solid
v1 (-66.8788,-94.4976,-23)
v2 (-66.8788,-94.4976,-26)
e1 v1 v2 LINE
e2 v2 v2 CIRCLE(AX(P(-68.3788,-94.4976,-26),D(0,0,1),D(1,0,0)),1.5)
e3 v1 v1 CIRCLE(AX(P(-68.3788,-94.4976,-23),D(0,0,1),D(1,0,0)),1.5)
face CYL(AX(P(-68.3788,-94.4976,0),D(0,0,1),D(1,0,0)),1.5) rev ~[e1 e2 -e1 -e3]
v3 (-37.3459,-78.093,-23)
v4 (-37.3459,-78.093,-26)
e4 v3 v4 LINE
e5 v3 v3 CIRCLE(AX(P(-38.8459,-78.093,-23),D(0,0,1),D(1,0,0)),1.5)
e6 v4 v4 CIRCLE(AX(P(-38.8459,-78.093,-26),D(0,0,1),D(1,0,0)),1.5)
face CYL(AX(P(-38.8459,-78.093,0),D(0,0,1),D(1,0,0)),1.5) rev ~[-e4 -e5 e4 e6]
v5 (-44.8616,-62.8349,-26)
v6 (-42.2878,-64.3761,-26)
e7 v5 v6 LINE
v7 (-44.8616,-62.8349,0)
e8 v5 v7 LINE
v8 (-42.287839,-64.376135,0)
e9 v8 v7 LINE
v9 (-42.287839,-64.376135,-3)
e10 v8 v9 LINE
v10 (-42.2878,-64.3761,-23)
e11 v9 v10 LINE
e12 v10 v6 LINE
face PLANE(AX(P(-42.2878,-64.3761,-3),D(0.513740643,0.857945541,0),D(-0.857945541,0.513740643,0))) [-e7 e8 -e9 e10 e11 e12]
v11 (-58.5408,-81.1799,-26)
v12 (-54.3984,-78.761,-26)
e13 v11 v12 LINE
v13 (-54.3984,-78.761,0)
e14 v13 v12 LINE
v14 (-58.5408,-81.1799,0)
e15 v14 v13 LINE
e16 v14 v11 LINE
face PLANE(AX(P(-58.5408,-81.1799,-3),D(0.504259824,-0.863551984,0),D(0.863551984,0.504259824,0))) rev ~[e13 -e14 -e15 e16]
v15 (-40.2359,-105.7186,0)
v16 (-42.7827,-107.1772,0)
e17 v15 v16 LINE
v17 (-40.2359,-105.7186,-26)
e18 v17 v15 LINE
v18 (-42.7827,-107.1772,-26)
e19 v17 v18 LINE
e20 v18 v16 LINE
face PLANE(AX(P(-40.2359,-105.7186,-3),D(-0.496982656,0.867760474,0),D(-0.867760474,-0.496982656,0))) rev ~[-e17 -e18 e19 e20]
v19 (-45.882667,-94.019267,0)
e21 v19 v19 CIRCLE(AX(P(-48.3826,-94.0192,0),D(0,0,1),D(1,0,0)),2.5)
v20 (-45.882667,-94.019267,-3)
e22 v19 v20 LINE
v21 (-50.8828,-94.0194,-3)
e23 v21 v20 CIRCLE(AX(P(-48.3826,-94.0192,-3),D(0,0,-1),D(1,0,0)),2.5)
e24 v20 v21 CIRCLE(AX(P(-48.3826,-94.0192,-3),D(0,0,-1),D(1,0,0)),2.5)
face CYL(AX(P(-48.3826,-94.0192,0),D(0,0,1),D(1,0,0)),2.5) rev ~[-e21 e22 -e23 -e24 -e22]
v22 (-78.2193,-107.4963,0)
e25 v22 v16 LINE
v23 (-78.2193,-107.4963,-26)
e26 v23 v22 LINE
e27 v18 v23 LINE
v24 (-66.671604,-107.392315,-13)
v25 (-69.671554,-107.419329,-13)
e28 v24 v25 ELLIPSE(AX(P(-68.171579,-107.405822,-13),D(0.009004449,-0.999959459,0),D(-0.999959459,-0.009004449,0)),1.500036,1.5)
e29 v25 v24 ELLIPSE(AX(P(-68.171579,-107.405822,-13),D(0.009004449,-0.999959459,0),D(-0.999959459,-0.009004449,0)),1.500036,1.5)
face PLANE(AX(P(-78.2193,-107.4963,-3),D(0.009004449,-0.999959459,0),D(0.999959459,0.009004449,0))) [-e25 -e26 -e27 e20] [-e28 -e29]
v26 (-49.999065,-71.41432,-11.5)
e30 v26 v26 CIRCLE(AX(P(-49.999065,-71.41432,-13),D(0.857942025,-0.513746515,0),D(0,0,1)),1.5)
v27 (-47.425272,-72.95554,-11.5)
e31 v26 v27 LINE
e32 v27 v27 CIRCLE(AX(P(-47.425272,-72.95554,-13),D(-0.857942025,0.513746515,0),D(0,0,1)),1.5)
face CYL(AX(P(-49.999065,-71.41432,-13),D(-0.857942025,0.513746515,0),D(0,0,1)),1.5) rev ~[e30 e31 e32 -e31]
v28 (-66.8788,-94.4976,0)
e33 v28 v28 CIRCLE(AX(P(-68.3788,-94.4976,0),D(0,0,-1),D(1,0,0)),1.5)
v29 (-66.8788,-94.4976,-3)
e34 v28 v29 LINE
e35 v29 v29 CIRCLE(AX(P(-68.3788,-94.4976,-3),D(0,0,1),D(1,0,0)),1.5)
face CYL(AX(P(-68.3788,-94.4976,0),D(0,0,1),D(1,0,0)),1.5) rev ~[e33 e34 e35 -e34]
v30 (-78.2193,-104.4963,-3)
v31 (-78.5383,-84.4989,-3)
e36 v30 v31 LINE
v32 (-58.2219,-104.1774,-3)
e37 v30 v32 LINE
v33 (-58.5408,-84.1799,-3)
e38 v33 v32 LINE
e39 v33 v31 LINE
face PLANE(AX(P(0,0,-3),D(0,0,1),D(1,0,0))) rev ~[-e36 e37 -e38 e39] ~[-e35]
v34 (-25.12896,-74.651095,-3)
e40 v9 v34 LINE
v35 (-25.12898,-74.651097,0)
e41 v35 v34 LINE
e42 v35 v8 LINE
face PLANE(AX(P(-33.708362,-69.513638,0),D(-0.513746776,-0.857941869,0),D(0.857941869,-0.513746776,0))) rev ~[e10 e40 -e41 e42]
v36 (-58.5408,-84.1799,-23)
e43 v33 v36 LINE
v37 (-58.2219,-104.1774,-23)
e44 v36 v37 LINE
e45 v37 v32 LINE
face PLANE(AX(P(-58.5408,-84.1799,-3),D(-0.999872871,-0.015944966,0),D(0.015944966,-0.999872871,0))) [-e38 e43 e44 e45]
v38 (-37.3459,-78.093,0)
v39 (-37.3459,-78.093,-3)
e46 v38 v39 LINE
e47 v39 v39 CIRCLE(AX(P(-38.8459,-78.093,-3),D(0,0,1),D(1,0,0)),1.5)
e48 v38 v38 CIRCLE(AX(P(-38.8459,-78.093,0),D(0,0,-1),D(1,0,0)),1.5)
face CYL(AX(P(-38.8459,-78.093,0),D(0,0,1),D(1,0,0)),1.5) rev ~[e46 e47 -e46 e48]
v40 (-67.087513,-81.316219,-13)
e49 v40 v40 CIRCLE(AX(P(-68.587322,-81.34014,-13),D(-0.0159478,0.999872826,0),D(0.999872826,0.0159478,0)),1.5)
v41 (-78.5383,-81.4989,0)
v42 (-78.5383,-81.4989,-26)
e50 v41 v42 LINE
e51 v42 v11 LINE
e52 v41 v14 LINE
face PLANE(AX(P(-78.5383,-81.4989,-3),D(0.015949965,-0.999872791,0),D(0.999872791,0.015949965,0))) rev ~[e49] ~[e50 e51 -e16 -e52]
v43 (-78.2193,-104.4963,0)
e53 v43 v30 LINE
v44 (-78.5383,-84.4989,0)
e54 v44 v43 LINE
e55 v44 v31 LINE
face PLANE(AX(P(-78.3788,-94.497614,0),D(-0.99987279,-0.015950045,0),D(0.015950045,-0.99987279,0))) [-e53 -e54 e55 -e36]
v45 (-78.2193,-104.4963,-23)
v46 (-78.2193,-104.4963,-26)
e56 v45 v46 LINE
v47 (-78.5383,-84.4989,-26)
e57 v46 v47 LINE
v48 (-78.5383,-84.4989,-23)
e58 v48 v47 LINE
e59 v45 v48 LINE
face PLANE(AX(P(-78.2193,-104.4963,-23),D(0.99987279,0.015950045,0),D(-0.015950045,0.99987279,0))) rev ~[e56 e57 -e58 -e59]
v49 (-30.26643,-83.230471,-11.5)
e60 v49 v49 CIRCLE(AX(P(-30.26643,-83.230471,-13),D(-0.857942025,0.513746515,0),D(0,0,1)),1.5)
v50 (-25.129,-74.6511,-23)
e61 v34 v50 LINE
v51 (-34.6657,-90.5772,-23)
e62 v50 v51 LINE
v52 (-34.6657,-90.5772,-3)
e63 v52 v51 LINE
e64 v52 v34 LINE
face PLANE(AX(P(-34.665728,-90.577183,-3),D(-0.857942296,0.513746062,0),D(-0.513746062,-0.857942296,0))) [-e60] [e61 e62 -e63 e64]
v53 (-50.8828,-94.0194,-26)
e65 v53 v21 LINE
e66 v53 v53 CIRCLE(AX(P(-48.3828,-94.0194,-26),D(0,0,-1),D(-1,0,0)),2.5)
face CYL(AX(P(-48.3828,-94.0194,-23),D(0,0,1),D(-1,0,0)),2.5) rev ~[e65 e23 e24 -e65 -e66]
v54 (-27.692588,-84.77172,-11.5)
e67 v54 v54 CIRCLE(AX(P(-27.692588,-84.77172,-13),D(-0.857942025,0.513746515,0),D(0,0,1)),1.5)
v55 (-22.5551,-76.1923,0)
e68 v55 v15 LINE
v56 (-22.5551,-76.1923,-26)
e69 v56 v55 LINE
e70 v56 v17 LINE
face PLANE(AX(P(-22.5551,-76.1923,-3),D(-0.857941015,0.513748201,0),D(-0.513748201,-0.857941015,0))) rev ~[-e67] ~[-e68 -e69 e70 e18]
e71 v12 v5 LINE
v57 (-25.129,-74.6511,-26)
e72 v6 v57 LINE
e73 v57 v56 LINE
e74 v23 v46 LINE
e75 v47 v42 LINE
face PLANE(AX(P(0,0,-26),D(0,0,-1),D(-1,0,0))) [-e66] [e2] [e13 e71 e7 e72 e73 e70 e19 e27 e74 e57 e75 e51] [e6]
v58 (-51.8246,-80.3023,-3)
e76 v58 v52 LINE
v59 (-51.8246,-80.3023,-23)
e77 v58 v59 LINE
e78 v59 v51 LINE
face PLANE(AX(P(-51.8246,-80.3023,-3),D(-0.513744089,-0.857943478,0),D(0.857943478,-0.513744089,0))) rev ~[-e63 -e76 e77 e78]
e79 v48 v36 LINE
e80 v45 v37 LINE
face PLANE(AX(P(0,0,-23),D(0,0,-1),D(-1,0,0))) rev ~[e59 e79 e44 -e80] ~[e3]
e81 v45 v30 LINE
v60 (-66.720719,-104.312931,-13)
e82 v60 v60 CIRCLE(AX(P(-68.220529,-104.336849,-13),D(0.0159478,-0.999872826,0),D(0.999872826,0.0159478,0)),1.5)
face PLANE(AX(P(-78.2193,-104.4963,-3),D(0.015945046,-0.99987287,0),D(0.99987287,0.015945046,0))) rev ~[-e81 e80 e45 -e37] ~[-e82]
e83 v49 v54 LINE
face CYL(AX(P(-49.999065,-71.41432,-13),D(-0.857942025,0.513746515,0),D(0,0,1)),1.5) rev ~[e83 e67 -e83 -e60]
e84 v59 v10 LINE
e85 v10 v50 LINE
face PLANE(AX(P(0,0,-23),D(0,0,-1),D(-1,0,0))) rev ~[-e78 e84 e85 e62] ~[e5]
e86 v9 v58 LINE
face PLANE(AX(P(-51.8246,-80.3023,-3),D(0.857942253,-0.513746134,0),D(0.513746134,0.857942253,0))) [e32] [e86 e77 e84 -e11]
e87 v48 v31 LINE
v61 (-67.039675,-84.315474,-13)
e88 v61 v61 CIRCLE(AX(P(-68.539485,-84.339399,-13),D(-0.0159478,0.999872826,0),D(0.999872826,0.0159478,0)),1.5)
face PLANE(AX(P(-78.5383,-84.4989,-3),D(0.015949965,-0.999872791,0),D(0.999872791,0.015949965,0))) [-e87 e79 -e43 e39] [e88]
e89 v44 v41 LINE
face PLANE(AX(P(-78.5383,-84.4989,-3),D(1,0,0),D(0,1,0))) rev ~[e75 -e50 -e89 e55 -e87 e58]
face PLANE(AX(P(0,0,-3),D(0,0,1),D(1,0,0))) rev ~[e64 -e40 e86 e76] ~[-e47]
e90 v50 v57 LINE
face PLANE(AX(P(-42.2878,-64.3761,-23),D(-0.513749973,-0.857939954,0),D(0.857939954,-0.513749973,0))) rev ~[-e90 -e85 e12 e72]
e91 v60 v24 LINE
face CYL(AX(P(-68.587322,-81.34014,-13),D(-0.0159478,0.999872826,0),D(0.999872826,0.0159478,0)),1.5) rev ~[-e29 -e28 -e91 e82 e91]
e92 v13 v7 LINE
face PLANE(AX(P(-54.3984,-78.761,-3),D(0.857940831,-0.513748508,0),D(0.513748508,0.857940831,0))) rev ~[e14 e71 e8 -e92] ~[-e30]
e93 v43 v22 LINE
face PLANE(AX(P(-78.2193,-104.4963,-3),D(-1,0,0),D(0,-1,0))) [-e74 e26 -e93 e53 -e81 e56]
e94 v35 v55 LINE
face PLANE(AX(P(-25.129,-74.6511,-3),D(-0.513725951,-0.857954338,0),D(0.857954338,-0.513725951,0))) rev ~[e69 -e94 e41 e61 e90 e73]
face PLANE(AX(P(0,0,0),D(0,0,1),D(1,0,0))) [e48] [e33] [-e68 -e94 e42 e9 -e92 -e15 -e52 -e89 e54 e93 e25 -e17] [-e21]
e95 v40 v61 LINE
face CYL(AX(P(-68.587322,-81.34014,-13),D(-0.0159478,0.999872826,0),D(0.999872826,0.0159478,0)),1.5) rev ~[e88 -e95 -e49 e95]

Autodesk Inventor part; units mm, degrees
ref_plane "YZ Plane" through (0, 0, 0) normal (1, 0, 0) x (0, 1, 0)
ref_plane "XZ Plane" through (0, 0, 0) normal (0, 1, 0) x (-1, 0, 0)
ref_plane "XY Plane" through (0, 0, 0) normal (0, 0, 1) x (1, 0, 0)
sketch "Sketch1" plane through (0, 0, 0) normal (0, 0, 1) x (1, 0, 0)
  circle A0 centre (-48.3826, -94.0192) radius 2.5
  circle A1 centre (2.8152, 8.6005) radius 2.5
  line L0 (-48.3826, -94.0192) -> (40.5013, 54.4144)
  line L1 (2.8152, 8.6005) -> (32.8522, -42.034)
  line L2 (-2.0828, 38.9998) -> (-2.0828, -39)
  line L3 (-2.0828, -0.0001) -> (69.8745, -0.0001)
  line L4 (7.9172, -0.0001) -> (-0.6834, -5.1021)
  line L5 (2.8152, 8.6005) -> (7.9172, -0.0001)
  line L6 (7.9172, -0.0001) -> (16.5177, 5.1019)
  line L7 (7.9172, -0.0001) -> (-0.6834, -5.1021)
  line L8 (-0.6834, -5.1021) -> (-0.6834, -5.1021)
  line L9 (7.9172, -0.0001) -> (16.5177, 5.1019)
  line L10 (16.5177, 5.1019) -> (16.5177, 5.1019)
  line L11 (7.9172, -0.0001) -> (-0.6622, 5.1374)
  line L12 (7.9172, -0.0001) -> (16.4966, -5.1375)
  line L13 (-48.3826, -94.0192) -> (-43.2452, -85.4397)
  line L14 (-54.6233, -56.9895) -> (-9.7188, -83.8789)
  line L15 (-43.2452, -85.4397) -> (-34.6657, -90.5772)
  line L16 (-43.2452, -85.4397) -> (-51.8246, -80.3023)
  line L17 (-34.6657, -90.5772) -> (16.4966, -5.1375)
  line L18 (-0.6622, 5.1374) -> (-51.8246, -80.3023)
  line L19 (-3.7386, 0) -> (13.452, 10.2217)
  line L20 (-3.7386, 0) -> (13.4203, -10.2749)
  circle A2 centre (6.9172, -34) radius 2.5
  circle A3 centre (6.9172, -34) radius 5
  circle A4 centre (6.9172, 34) radius 2.5
  circle A5 centre (6.9172, 34) radius 4.9998
  line L21 (15.8878, 38.9998) -> (-2.0828, 38.9998)
  line L22 (-2.0828, -39) -> (15.933, -39)
  line L23 (-13.3434, -16.0398) -> (19.6624, -35.8041)
  line L24 (-13.3434, 16.0396) -> (19.6624, 35.8039)
  line L25 (-13.3434, -16.0398) -> (-15.9172, -14.4985)
  line L26 (-2.0828, -0.0001) -> (-26.2435, -0.0001)
  line L27 (-15.9172, -14.4985) -> (-7.2354, -0.0001)
  line L28 (-13.3434, 16.0396) -> (-15.9172, 14.4984)
  line L29 (-15.9172, 14.4984) -> (-7.2354, -0.0001)
  line L30 (13.4203, -10.2749) -> (15.9172, -11.7701)
  line L31 (15.933, -39) -> (15.8878, 38.9998)
  line L32 (13.452, 10.2217) -> (15.9037, 11.6795)
  line L33 (15.9037, 11.6795) -> (6.3124, 27.8097)
  line L34 (15.9172, -11.7701) -> (6.3124, -27.8099)
  line L35 (15.9037, 11.6795) -> (15.9172, -11.7701)
  line L36 (-15.9172, -14.4985) -> (-15.9172, 14.4984)
  line L37 (6.3124, 27.8097) -> (-15.9172, 14.4984) projected
  circle A6 centre (-48.3826, -94.0192) radius 2.5
  line L38 (-311.4249, 0) -> (127.5863, 0)
  line L39 (-170.3704, -117.2696) -> (-13.4682, 154.4931)
  line L40 (-102.6648, 0) -> (-157.9558, -95.7668)
  line L41 (-157.9558, -95.7668) -> (-48.3826, -94.0192)
  line L42 (-48.3826, -94.0192) -> (-58.3814, -94.1786)
  line L43 (-58.3814, -94.1786) -> (-58.5408, -84.1799)
  line L44 (-58.5408, -84.1799) -> (-58.2219, -104.1774)
  line L45 (-51.8246, -80.3023) -> (-41.5497, -63.1434)
  line L46 (-41.5497, -63.1434) -> (-24.3908, -73.4184)
  line L47 (-58.5408, -84.1799) -> (-78.5383, -84.4989)
  line L48 (-78.5383, -84.4989) -> (-78.2193, -104.4963)
  line L49 (-78.2193, -104.4963) -> (-58.2219, -104.1774)
  line L50 (-58.5408, -84.1799) -> (-51.8246, -80.3023)
  line L51 (-58.2219, -104.1774) -> (-26.2433, -104.1774)
  line L52 (-34.6657, -90.5772) -> (-48.6317, -113.8999)
  circle A7 centre (-48.3828, -94.0194) radius 2.5 projected
  point P0 (0, 0)
  point P1 (6.9172, -21)
  point P2 (-3.7386, 0)
  point P3 (-42.2878, -64.3761)
  point P4 (-42.8097, -104.1774)
  point P5 (-25.129, -74.6511)
  dimension "d0" = 10
  dimension "d1" = 10
  dimension "d2" = 10
  dimension "d3" = 10
  dimension "d4" = 10
  dimension "d5" = 10
  dimension "d6" = 10
  dimension "d7" = 10
  dimension "d8" = 10
  dimension "d9" = 10
  dimension "d10" = 10
  dimension "d11" = 20
  dimension "d12" = 20
  dimension "d13" = 3
  dimension "d14" = 3
  dimension "d20" = 110.582
  dimension "d21" = 10
  dimension "d22" = 10
  dimension "d23" = 20
  dimension "d24" = 20
  dimension "d25" = 20
  dimension "d26" = 121.827
  dimension "d27" = 146.9972
extrude "Extrusion1" add sketch "Sketch1" against normal blind 3 contours A0 L0 L15 L52 L51 L44 L41 | A0 L41 L43 L50 L16 L0 | L16 L18 L14 L0 | L0 L14 L17 L15 | L44 L49 L48 L41 | L41 L48 L47 L43
sketch "Sketch2" plane through (0, 0, -3) normal (0, 0, -1) x (-1, 0, 0)
  line L0 (51.8246, -80.3023) -> (42.2878, -64.3761) projected
  line L1 (25.129, -74.6511) -> (42.8097, -104.1774) projected
  line L2 (78.5383, -84.4989) -> (58.5408, -84.1799)
  line L3 (58.5408, -84.1799) -> (51.8246, -80.3023)
  line L4 (42.2878, -64.3761) -> (25.129, -74.6511)
  line L5 (78.5383, -84.4989) -> (78.2193, -104.4963)
  line L6 (58.5408, -84.1799) -> (58.5408, -81.1799)
  line L7 (51.8246, -80.3023) -> (54.3984, -78.761)
  line L8 (42.8097, -104.1774) -> (40.2359, -105.7186)
  line L9 (42.8097, -104.1774) -> (42.7827, -107.1772)
  line L10 (78.5383, -84.4989) -> (78.5383, -81.4989)
  line L11 (78.2193, -104.4963) -> (78.2193, -107.4963)
  line L12 (42.2878, -64.3761) -> (44.8616, -62.8349)
  line L13 (42.2878, -64.3761) -> (25.129, -74.6511) projected
  line L14 (25.129, -74.6511) -> (22.5551, -76.1923)
  line L15 (78.5383, -81.4989) -> (58.5408, -81.1799)
  line L16 (58.5408, -81.1799) -> (54.3984, -78.761)
  line L17 (54.3984, -78.761) -> (44.8616, -62.8349)
  line L18 (22.5551, -76.1923) -> (40.2359, -105.7186)
  line L19 (40.2359, -105.7186) -> (42.7827, -107.1772)
  line L20 (78.2193, -107.4963) -> (42.7827, -107.1772)
  line L21 (58.5408, -84.1799) -> (58.2219, -104.1774)
  line L22 (51.8246, -80.3023) -> (34.6657, -90.5772)
  circle A0 centre (48.3826, -94.0192) radius 2.5 projected
  circle A1 centre (48.3826, -94.0192) radius 2.5
  line L23 (78.2193, -104.4963) -> (42.8097, -104.1774)
  line L24 (58.2219, -104.1774) -> (42.8097, -104.1774) projected
  line L25 (78.2193, -104.4963) -> (58.2219, -104.1774) projected
  point P0 (0, 0)
  dimension "d30" = 3
  dimension "d31" = 3
  dimension "d32" = 3
  dimension "d33" = 3
  dimension "d34" = 3
  dimension "d35" = 3
  dimension "d36" = 3
  dimension "d37" = 3
extrude "Extrusion2" add sketch "Sketch2" along normal blind 20 and the other way blind 3 contours L7 L16 L6 L3 | L0 L12 L17 L7 | L6 L15 L10 L2 | L1 L8 L18 L14 | L25 L23 L24 | L9 L19 L8 | L23 L11 L20 L9
sketch "Sketch3" plane through (0, 0, -3) normal (0, 0, -1) x (-1, 0, 0)
  line L0 (58.5408, -84.1799) -> (51.8246, -80.3023) projected
  line L1 (51.8246, -80.3023) -> (34.6657, -90.5772)
  line L2 (25.129, -74.6511) -> (42.8097, -104.1774) projected
  line L3 (42.8097, -104.1774) -> (58.2219, -104.1774) projected
  line L4 (58.5408, -84.1799) -> (58.2219, -104.1774)
  line L5 (78.2193, -104.4963) -> (42.8097, -104.1774) projected
  line L6 (42.8097, -104.1774) -> (25.129, -74.6511) projected
  circle A0 centre (48.3828, -94.0194) radius 2.5 projected
  point P0 (0, 0)
  dimension "d42" = 119.086
extrude "Extrusion3" add sketch "Sketch3" along normal blind 20
sketch "Sketch4" plane through (0, 0, -23) normal (0, 0, -1) x (-1, 0, 0)
  point P0 (0, 0)
sketch "Sketch5" plane through (0, 0, -23) normal (0, 0, -1) x (-1, 0, 0)
  circle A0 centre (48.3828, -94.0194) radius 2.5 projected
  line L0 (44.8616, -62.8349) -> (42.2878, -64.3761) projected
  line L1 (42.2878, -64.3761) -> (51.8246, -80.3023) projected
  line L2 (51.8246, -80.3023) -> (34.6657, -90.5772) projected
  line L3 (34.6657, -90.5772) -> (25.129, -74.6511) projected
  line L4 (25.129, -74.6511) -> (22.5551, -76.1923) projected
  line L5 (22.5551, -76.1923) -> (40.2359, -105.7186) projected
  line L6 (40.2359, -105.7186) -> (42.7827, -107.1772) projected
  line L7 (42.7827, -107.1772) -> (78.2193, -107.4963) projected
  line L8 (78.2193, -107.4963) -> (78.2193, -104.4963) projected
  line L9 (78.2193, -104.4963) -> (58.2219, -104.1774) projected
  line L10 (58.2219, -104.1774) -> (58.5408, -84.1799) projected
  line L11 (58.5408, -84.1799) -> (78.5383, -84.4989) projected
  line L12 (78.5383, -84.4989) -> (78.5383, -81.4989) projected
  line L13 (78.5383, -81.4989) -> (58.5408, -81.1799) projected
  line L14 (58.5408, -81.1799) -> (54.3984, -78.761) projected
  line L15 (54.3984, -78.761) -> (44.8616, -62.8349) projected
  line L16 (58.5408, -84.1799) -> (58.2219, -104.1774) projected
  line L17 (58.2219, -104.1774) -> (78.2193, -104.4963) projected
  line L18 (78.2193, -104.4963) -> (78.5383, -84.4989) projected
  line L19 (78.5383, -84.4989) -> (58.5408, -84.1799) projected
  line L20 (34.6657, -90.5772) -> (51.8246, -80.3023) projected
  line L21 (51.8246, -80.3023) -> (42.2878, -64.3761) projected
  line L22 (42.2878, -64.3761) -> (25.129, -74.6511) projected
  line L23 (25.129, -74.6511) -> (34.6657, -90.5772) projected
  point P0 (0, 0)
extrude "Extrusion4" add sketch "Sketch5" along normal blind 3
sketch "Sketch6" plane through (0, 0, 0) normal (0, 0, 1) x (1, 0, 0)
  line L0 (-42.2878, -64.3761) -> (-25.129, -74.6511) projected
  line L1 (-33.7084, -69.5136) -> (-49.5228, -95.9232)
  line L2 (-33.7084, -69.5136) -> (-38.8459, -78.093)
  circle A0 centre (-38.8459, -78.093) radius 1.5
  line L3 (-78.5383, -84.4989) -> (-78.2193, -104.4963) projected
  line L4 (-78.3788, -94.4976) -> (-68.3788, -94.4976)
  circle A1 centre (-68.3788, -94.4976) radius 1.5
  point P0 (0, 0)
  dimension "d47" = 10
  dimension "d48" = 3
  dimension "d56" = 10
  dimension "d57" = 3
extrude "Extrusion5" cut sketch "Sketch6" against normal through all
sketch "Sketch7" plane through (-44.8616, -62.8349, -26) normal (-0.857942, 0.5137465, 0) x (0, 0, 1)
  line L0 (0, 0) -> (26, 0) projected
  line L1 (26, 0) -> (13, 0)
  line L2 (13, 0) -> (13, -10)
  line L3 (13, -10) -> (26, -10)
  line L4 (26, -10) -> (26, 0)
  circle A0 centre (13, -10) radius 1.5
  point P0 (26, 76.9562)
  dimension "d51" = 13
  dimension "d52" = 10
  dimension "d53" = 3
extrude "Extrusion6" cut sketch "Sketch7" against normal through all contours A0 L3 L2 | L2 L3 A0
sketch "Sketch8" plane through (-58.5408, -81.1799, 0) normal (-0.0159478, 0.9998728, 0) x (0.9998728, 0.0159478, 0)
  line L0 (-20.0478, 3) -> (-20.0478, 23) projected
  line L1 (-20.0478, 13) -> (-10.0478, 13)
  circle A0 centre (-10.0478, 13) radius 1.5
  point P0 (59.828, 0)
  dimension "d58" = 10
  dimension "d59" = 3
extrude "Extrusion7" cut sketch "Sketch8" against normal through all
properties part number "2020_nodes_conn"
